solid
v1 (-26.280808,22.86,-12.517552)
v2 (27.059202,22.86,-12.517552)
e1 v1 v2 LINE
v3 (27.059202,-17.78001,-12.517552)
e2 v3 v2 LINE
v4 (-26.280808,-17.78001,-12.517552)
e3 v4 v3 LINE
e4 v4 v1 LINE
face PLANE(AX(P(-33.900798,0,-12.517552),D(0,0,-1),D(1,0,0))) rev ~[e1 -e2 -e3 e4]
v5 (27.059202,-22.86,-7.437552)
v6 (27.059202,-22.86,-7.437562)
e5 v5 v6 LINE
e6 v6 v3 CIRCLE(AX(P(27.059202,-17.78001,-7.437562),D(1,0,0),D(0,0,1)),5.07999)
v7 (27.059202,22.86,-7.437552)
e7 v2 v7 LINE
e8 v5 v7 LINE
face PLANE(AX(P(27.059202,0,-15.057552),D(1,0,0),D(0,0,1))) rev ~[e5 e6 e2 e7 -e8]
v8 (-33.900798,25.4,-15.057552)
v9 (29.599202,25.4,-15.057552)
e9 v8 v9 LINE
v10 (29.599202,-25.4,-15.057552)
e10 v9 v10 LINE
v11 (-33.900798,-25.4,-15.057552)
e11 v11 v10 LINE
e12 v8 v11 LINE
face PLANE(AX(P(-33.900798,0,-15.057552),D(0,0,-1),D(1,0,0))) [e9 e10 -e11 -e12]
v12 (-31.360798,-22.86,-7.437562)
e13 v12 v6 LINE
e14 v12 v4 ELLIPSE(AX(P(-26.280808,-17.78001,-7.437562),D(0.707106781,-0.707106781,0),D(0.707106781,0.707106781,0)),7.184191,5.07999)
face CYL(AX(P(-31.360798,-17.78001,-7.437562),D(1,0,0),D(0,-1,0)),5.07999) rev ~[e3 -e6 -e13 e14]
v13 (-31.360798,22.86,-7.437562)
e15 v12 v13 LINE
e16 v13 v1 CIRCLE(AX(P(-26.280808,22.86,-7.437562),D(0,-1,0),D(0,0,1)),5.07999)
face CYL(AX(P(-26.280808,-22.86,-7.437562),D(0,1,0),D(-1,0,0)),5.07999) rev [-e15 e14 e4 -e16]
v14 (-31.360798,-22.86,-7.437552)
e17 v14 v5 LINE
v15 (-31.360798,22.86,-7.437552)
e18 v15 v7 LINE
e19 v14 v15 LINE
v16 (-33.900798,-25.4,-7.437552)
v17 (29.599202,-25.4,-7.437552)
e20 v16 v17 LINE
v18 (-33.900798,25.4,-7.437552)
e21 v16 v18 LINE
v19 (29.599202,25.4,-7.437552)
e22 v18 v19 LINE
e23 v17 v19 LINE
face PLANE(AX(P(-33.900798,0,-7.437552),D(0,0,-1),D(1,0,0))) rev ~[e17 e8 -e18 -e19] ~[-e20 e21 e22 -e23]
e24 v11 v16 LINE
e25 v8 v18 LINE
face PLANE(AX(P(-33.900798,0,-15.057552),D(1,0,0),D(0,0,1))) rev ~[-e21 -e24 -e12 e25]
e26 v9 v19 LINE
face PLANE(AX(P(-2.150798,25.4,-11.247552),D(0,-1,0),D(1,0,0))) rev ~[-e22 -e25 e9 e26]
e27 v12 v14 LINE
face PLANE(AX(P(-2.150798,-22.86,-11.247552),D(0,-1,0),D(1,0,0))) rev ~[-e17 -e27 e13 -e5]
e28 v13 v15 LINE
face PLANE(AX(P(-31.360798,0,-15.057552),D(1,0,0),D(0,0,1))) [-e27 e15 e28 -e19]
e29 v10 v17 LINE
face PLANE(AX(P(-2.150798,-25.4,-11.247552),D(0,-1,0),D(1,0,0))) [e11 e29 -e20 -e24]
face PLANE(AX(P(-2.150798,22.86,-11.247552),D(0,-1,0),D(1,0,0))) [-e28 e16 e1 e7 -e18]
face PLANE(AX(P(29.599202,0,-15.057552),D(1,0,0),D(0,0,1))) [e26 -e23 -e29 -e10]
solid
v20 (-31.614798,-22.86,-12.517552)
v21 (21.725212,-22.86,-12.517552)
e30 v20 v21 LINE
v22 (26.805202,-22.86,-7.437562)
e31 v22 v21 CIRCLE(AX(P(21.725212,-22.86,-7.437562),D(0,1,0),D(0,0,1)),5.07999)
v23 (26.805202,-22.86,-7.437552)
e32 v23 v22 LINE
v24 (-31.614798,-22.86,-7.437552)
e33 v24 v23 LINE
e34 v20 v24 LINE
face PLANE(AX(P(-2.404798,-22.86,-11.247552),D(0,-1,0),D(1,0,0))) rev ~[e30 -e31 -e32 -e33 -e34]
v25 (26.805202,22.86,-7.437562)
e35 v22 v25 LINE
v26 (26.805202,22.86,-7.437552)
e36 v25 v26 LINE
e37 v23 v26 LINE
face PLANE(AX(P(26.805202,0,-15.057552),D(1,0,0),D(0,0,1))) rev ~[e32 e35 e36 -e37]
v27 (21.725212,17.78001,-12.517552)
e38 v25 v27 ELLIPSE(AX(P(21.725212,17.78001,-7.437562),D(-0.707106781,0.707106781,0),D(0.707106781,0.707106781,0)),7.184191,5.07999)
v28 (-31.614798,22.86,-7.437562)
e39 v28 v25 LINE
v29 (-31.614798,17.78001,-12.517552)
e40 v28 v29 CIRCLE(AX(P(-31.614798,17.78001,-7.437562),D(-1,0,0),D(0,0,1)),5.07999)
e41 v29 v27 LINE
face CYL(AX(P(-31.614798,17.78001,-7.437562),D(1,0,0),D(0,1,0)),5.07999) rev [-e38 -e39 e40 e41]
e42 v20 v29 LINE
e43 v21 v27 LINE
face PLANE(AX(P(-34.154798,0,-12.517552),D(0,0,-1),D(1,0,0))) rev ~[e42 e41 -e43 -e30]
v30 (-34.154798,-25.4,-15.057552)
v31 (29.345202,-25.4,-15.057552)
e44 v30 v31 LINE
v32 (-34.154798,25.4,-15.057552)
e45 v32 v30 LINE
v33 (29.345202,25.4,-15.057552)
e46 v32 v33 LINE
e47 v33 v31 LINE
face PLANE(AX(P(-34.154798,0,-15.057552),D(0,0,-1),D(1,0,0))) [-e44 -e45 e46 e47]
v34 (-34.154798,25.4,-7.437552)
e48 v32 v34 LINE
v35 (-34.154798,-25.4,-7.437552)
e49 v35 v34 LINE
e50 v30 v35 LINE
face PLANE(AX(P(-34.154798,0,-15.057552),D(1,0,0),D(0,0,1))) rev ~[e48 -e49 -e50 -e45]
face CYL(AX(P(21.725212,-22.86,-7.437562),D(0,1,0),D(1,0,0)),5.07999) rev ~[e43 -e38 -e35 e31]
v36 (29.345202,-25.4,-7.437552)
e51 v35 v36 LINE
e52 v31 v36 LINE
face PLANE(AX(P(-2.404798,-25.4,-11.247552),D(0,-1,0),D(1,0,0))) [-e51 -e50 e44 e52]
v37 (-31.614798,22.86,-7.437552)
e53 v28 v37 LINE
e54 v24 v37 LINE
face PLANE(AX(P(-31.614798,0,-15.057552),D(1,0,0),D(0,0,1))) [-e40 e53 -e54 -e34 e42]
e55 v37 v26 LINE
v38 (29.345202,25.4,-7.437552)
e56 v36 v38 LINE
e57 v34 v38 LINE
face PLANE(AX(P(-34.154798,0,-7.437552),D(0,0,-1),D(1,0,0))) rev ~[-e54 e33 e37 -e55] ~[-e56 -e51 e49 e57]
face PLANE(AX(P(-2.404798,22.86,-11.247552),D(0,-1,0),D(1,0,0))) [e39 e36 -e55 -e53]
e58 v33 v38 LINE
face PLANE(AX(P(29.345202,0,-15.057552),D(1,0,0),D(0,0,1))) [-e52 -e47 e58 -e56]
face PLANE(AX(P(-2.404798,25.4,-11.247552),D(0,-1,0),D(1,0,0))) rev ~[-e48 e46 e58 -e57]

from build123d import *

# Parameters (mm, degrees)
F0_W     = 63.5
F0_H     = 7.62
F1_DEPTH = 25.4
F2_T     = -2.54
F4_R     = 5.07999
F4_2_R   = 5.07999


# Not quite as in the source:
# - a fillet or chamfer is up to 0.001 mm smaller than in the source, because OpenCascade refuses the exact size


with BuildPart() as f1:
    # F0 (on Front) → F1 (new body, symmetric)
    with BuildSketch(Plane.XZ):
        with Locations((-2.1507982165, -11.2475522422)):
            Rectangle(F0_W, F0_H)
    extrude(amount=F1_DEPTH, both=True)

    # F2
    f2_openings = [f1.faces().sort_by_distance(p)[0] for p in [
        (-2.150798, 0, -7.437552),
    ]]
    offset(amount=F2_T, openings=f2_openings)


with BuildPart() as f3_1:
    # F3: copy of F1
    add(f1.part.moved(Location((-0.254, 0, 0))))

    # F4#2 (radius 5.08 in the source; OpenCascade refuses exactly that, so slightly less here)
    f4_2_edges = [f3_1.edges().sort_by_distance(p)[0] for p in [
        (-2.404798, 22.86, -12.517552),
        (26.805202, 0, -12.517552),
    ]]
    fillet(f4_2_edges, radius=F4_2_R)


with BuildPart() as f1_1:
    add(f1.part)

    # F4 (radius 5.08 in the source; OpenCascade refuses exactly that, so slightly less here)
    f4_edges = [f1_1.edges().sort_by_distance(p)[0] for p in [
        (-31.360798, 0, -12.517552),
        (-2.150798, -22.86, -12.517552),
    ]]
    fillet(f4_edges, radius=F4_R)


solid = Compound([f3_1.part, f1_1.part])
